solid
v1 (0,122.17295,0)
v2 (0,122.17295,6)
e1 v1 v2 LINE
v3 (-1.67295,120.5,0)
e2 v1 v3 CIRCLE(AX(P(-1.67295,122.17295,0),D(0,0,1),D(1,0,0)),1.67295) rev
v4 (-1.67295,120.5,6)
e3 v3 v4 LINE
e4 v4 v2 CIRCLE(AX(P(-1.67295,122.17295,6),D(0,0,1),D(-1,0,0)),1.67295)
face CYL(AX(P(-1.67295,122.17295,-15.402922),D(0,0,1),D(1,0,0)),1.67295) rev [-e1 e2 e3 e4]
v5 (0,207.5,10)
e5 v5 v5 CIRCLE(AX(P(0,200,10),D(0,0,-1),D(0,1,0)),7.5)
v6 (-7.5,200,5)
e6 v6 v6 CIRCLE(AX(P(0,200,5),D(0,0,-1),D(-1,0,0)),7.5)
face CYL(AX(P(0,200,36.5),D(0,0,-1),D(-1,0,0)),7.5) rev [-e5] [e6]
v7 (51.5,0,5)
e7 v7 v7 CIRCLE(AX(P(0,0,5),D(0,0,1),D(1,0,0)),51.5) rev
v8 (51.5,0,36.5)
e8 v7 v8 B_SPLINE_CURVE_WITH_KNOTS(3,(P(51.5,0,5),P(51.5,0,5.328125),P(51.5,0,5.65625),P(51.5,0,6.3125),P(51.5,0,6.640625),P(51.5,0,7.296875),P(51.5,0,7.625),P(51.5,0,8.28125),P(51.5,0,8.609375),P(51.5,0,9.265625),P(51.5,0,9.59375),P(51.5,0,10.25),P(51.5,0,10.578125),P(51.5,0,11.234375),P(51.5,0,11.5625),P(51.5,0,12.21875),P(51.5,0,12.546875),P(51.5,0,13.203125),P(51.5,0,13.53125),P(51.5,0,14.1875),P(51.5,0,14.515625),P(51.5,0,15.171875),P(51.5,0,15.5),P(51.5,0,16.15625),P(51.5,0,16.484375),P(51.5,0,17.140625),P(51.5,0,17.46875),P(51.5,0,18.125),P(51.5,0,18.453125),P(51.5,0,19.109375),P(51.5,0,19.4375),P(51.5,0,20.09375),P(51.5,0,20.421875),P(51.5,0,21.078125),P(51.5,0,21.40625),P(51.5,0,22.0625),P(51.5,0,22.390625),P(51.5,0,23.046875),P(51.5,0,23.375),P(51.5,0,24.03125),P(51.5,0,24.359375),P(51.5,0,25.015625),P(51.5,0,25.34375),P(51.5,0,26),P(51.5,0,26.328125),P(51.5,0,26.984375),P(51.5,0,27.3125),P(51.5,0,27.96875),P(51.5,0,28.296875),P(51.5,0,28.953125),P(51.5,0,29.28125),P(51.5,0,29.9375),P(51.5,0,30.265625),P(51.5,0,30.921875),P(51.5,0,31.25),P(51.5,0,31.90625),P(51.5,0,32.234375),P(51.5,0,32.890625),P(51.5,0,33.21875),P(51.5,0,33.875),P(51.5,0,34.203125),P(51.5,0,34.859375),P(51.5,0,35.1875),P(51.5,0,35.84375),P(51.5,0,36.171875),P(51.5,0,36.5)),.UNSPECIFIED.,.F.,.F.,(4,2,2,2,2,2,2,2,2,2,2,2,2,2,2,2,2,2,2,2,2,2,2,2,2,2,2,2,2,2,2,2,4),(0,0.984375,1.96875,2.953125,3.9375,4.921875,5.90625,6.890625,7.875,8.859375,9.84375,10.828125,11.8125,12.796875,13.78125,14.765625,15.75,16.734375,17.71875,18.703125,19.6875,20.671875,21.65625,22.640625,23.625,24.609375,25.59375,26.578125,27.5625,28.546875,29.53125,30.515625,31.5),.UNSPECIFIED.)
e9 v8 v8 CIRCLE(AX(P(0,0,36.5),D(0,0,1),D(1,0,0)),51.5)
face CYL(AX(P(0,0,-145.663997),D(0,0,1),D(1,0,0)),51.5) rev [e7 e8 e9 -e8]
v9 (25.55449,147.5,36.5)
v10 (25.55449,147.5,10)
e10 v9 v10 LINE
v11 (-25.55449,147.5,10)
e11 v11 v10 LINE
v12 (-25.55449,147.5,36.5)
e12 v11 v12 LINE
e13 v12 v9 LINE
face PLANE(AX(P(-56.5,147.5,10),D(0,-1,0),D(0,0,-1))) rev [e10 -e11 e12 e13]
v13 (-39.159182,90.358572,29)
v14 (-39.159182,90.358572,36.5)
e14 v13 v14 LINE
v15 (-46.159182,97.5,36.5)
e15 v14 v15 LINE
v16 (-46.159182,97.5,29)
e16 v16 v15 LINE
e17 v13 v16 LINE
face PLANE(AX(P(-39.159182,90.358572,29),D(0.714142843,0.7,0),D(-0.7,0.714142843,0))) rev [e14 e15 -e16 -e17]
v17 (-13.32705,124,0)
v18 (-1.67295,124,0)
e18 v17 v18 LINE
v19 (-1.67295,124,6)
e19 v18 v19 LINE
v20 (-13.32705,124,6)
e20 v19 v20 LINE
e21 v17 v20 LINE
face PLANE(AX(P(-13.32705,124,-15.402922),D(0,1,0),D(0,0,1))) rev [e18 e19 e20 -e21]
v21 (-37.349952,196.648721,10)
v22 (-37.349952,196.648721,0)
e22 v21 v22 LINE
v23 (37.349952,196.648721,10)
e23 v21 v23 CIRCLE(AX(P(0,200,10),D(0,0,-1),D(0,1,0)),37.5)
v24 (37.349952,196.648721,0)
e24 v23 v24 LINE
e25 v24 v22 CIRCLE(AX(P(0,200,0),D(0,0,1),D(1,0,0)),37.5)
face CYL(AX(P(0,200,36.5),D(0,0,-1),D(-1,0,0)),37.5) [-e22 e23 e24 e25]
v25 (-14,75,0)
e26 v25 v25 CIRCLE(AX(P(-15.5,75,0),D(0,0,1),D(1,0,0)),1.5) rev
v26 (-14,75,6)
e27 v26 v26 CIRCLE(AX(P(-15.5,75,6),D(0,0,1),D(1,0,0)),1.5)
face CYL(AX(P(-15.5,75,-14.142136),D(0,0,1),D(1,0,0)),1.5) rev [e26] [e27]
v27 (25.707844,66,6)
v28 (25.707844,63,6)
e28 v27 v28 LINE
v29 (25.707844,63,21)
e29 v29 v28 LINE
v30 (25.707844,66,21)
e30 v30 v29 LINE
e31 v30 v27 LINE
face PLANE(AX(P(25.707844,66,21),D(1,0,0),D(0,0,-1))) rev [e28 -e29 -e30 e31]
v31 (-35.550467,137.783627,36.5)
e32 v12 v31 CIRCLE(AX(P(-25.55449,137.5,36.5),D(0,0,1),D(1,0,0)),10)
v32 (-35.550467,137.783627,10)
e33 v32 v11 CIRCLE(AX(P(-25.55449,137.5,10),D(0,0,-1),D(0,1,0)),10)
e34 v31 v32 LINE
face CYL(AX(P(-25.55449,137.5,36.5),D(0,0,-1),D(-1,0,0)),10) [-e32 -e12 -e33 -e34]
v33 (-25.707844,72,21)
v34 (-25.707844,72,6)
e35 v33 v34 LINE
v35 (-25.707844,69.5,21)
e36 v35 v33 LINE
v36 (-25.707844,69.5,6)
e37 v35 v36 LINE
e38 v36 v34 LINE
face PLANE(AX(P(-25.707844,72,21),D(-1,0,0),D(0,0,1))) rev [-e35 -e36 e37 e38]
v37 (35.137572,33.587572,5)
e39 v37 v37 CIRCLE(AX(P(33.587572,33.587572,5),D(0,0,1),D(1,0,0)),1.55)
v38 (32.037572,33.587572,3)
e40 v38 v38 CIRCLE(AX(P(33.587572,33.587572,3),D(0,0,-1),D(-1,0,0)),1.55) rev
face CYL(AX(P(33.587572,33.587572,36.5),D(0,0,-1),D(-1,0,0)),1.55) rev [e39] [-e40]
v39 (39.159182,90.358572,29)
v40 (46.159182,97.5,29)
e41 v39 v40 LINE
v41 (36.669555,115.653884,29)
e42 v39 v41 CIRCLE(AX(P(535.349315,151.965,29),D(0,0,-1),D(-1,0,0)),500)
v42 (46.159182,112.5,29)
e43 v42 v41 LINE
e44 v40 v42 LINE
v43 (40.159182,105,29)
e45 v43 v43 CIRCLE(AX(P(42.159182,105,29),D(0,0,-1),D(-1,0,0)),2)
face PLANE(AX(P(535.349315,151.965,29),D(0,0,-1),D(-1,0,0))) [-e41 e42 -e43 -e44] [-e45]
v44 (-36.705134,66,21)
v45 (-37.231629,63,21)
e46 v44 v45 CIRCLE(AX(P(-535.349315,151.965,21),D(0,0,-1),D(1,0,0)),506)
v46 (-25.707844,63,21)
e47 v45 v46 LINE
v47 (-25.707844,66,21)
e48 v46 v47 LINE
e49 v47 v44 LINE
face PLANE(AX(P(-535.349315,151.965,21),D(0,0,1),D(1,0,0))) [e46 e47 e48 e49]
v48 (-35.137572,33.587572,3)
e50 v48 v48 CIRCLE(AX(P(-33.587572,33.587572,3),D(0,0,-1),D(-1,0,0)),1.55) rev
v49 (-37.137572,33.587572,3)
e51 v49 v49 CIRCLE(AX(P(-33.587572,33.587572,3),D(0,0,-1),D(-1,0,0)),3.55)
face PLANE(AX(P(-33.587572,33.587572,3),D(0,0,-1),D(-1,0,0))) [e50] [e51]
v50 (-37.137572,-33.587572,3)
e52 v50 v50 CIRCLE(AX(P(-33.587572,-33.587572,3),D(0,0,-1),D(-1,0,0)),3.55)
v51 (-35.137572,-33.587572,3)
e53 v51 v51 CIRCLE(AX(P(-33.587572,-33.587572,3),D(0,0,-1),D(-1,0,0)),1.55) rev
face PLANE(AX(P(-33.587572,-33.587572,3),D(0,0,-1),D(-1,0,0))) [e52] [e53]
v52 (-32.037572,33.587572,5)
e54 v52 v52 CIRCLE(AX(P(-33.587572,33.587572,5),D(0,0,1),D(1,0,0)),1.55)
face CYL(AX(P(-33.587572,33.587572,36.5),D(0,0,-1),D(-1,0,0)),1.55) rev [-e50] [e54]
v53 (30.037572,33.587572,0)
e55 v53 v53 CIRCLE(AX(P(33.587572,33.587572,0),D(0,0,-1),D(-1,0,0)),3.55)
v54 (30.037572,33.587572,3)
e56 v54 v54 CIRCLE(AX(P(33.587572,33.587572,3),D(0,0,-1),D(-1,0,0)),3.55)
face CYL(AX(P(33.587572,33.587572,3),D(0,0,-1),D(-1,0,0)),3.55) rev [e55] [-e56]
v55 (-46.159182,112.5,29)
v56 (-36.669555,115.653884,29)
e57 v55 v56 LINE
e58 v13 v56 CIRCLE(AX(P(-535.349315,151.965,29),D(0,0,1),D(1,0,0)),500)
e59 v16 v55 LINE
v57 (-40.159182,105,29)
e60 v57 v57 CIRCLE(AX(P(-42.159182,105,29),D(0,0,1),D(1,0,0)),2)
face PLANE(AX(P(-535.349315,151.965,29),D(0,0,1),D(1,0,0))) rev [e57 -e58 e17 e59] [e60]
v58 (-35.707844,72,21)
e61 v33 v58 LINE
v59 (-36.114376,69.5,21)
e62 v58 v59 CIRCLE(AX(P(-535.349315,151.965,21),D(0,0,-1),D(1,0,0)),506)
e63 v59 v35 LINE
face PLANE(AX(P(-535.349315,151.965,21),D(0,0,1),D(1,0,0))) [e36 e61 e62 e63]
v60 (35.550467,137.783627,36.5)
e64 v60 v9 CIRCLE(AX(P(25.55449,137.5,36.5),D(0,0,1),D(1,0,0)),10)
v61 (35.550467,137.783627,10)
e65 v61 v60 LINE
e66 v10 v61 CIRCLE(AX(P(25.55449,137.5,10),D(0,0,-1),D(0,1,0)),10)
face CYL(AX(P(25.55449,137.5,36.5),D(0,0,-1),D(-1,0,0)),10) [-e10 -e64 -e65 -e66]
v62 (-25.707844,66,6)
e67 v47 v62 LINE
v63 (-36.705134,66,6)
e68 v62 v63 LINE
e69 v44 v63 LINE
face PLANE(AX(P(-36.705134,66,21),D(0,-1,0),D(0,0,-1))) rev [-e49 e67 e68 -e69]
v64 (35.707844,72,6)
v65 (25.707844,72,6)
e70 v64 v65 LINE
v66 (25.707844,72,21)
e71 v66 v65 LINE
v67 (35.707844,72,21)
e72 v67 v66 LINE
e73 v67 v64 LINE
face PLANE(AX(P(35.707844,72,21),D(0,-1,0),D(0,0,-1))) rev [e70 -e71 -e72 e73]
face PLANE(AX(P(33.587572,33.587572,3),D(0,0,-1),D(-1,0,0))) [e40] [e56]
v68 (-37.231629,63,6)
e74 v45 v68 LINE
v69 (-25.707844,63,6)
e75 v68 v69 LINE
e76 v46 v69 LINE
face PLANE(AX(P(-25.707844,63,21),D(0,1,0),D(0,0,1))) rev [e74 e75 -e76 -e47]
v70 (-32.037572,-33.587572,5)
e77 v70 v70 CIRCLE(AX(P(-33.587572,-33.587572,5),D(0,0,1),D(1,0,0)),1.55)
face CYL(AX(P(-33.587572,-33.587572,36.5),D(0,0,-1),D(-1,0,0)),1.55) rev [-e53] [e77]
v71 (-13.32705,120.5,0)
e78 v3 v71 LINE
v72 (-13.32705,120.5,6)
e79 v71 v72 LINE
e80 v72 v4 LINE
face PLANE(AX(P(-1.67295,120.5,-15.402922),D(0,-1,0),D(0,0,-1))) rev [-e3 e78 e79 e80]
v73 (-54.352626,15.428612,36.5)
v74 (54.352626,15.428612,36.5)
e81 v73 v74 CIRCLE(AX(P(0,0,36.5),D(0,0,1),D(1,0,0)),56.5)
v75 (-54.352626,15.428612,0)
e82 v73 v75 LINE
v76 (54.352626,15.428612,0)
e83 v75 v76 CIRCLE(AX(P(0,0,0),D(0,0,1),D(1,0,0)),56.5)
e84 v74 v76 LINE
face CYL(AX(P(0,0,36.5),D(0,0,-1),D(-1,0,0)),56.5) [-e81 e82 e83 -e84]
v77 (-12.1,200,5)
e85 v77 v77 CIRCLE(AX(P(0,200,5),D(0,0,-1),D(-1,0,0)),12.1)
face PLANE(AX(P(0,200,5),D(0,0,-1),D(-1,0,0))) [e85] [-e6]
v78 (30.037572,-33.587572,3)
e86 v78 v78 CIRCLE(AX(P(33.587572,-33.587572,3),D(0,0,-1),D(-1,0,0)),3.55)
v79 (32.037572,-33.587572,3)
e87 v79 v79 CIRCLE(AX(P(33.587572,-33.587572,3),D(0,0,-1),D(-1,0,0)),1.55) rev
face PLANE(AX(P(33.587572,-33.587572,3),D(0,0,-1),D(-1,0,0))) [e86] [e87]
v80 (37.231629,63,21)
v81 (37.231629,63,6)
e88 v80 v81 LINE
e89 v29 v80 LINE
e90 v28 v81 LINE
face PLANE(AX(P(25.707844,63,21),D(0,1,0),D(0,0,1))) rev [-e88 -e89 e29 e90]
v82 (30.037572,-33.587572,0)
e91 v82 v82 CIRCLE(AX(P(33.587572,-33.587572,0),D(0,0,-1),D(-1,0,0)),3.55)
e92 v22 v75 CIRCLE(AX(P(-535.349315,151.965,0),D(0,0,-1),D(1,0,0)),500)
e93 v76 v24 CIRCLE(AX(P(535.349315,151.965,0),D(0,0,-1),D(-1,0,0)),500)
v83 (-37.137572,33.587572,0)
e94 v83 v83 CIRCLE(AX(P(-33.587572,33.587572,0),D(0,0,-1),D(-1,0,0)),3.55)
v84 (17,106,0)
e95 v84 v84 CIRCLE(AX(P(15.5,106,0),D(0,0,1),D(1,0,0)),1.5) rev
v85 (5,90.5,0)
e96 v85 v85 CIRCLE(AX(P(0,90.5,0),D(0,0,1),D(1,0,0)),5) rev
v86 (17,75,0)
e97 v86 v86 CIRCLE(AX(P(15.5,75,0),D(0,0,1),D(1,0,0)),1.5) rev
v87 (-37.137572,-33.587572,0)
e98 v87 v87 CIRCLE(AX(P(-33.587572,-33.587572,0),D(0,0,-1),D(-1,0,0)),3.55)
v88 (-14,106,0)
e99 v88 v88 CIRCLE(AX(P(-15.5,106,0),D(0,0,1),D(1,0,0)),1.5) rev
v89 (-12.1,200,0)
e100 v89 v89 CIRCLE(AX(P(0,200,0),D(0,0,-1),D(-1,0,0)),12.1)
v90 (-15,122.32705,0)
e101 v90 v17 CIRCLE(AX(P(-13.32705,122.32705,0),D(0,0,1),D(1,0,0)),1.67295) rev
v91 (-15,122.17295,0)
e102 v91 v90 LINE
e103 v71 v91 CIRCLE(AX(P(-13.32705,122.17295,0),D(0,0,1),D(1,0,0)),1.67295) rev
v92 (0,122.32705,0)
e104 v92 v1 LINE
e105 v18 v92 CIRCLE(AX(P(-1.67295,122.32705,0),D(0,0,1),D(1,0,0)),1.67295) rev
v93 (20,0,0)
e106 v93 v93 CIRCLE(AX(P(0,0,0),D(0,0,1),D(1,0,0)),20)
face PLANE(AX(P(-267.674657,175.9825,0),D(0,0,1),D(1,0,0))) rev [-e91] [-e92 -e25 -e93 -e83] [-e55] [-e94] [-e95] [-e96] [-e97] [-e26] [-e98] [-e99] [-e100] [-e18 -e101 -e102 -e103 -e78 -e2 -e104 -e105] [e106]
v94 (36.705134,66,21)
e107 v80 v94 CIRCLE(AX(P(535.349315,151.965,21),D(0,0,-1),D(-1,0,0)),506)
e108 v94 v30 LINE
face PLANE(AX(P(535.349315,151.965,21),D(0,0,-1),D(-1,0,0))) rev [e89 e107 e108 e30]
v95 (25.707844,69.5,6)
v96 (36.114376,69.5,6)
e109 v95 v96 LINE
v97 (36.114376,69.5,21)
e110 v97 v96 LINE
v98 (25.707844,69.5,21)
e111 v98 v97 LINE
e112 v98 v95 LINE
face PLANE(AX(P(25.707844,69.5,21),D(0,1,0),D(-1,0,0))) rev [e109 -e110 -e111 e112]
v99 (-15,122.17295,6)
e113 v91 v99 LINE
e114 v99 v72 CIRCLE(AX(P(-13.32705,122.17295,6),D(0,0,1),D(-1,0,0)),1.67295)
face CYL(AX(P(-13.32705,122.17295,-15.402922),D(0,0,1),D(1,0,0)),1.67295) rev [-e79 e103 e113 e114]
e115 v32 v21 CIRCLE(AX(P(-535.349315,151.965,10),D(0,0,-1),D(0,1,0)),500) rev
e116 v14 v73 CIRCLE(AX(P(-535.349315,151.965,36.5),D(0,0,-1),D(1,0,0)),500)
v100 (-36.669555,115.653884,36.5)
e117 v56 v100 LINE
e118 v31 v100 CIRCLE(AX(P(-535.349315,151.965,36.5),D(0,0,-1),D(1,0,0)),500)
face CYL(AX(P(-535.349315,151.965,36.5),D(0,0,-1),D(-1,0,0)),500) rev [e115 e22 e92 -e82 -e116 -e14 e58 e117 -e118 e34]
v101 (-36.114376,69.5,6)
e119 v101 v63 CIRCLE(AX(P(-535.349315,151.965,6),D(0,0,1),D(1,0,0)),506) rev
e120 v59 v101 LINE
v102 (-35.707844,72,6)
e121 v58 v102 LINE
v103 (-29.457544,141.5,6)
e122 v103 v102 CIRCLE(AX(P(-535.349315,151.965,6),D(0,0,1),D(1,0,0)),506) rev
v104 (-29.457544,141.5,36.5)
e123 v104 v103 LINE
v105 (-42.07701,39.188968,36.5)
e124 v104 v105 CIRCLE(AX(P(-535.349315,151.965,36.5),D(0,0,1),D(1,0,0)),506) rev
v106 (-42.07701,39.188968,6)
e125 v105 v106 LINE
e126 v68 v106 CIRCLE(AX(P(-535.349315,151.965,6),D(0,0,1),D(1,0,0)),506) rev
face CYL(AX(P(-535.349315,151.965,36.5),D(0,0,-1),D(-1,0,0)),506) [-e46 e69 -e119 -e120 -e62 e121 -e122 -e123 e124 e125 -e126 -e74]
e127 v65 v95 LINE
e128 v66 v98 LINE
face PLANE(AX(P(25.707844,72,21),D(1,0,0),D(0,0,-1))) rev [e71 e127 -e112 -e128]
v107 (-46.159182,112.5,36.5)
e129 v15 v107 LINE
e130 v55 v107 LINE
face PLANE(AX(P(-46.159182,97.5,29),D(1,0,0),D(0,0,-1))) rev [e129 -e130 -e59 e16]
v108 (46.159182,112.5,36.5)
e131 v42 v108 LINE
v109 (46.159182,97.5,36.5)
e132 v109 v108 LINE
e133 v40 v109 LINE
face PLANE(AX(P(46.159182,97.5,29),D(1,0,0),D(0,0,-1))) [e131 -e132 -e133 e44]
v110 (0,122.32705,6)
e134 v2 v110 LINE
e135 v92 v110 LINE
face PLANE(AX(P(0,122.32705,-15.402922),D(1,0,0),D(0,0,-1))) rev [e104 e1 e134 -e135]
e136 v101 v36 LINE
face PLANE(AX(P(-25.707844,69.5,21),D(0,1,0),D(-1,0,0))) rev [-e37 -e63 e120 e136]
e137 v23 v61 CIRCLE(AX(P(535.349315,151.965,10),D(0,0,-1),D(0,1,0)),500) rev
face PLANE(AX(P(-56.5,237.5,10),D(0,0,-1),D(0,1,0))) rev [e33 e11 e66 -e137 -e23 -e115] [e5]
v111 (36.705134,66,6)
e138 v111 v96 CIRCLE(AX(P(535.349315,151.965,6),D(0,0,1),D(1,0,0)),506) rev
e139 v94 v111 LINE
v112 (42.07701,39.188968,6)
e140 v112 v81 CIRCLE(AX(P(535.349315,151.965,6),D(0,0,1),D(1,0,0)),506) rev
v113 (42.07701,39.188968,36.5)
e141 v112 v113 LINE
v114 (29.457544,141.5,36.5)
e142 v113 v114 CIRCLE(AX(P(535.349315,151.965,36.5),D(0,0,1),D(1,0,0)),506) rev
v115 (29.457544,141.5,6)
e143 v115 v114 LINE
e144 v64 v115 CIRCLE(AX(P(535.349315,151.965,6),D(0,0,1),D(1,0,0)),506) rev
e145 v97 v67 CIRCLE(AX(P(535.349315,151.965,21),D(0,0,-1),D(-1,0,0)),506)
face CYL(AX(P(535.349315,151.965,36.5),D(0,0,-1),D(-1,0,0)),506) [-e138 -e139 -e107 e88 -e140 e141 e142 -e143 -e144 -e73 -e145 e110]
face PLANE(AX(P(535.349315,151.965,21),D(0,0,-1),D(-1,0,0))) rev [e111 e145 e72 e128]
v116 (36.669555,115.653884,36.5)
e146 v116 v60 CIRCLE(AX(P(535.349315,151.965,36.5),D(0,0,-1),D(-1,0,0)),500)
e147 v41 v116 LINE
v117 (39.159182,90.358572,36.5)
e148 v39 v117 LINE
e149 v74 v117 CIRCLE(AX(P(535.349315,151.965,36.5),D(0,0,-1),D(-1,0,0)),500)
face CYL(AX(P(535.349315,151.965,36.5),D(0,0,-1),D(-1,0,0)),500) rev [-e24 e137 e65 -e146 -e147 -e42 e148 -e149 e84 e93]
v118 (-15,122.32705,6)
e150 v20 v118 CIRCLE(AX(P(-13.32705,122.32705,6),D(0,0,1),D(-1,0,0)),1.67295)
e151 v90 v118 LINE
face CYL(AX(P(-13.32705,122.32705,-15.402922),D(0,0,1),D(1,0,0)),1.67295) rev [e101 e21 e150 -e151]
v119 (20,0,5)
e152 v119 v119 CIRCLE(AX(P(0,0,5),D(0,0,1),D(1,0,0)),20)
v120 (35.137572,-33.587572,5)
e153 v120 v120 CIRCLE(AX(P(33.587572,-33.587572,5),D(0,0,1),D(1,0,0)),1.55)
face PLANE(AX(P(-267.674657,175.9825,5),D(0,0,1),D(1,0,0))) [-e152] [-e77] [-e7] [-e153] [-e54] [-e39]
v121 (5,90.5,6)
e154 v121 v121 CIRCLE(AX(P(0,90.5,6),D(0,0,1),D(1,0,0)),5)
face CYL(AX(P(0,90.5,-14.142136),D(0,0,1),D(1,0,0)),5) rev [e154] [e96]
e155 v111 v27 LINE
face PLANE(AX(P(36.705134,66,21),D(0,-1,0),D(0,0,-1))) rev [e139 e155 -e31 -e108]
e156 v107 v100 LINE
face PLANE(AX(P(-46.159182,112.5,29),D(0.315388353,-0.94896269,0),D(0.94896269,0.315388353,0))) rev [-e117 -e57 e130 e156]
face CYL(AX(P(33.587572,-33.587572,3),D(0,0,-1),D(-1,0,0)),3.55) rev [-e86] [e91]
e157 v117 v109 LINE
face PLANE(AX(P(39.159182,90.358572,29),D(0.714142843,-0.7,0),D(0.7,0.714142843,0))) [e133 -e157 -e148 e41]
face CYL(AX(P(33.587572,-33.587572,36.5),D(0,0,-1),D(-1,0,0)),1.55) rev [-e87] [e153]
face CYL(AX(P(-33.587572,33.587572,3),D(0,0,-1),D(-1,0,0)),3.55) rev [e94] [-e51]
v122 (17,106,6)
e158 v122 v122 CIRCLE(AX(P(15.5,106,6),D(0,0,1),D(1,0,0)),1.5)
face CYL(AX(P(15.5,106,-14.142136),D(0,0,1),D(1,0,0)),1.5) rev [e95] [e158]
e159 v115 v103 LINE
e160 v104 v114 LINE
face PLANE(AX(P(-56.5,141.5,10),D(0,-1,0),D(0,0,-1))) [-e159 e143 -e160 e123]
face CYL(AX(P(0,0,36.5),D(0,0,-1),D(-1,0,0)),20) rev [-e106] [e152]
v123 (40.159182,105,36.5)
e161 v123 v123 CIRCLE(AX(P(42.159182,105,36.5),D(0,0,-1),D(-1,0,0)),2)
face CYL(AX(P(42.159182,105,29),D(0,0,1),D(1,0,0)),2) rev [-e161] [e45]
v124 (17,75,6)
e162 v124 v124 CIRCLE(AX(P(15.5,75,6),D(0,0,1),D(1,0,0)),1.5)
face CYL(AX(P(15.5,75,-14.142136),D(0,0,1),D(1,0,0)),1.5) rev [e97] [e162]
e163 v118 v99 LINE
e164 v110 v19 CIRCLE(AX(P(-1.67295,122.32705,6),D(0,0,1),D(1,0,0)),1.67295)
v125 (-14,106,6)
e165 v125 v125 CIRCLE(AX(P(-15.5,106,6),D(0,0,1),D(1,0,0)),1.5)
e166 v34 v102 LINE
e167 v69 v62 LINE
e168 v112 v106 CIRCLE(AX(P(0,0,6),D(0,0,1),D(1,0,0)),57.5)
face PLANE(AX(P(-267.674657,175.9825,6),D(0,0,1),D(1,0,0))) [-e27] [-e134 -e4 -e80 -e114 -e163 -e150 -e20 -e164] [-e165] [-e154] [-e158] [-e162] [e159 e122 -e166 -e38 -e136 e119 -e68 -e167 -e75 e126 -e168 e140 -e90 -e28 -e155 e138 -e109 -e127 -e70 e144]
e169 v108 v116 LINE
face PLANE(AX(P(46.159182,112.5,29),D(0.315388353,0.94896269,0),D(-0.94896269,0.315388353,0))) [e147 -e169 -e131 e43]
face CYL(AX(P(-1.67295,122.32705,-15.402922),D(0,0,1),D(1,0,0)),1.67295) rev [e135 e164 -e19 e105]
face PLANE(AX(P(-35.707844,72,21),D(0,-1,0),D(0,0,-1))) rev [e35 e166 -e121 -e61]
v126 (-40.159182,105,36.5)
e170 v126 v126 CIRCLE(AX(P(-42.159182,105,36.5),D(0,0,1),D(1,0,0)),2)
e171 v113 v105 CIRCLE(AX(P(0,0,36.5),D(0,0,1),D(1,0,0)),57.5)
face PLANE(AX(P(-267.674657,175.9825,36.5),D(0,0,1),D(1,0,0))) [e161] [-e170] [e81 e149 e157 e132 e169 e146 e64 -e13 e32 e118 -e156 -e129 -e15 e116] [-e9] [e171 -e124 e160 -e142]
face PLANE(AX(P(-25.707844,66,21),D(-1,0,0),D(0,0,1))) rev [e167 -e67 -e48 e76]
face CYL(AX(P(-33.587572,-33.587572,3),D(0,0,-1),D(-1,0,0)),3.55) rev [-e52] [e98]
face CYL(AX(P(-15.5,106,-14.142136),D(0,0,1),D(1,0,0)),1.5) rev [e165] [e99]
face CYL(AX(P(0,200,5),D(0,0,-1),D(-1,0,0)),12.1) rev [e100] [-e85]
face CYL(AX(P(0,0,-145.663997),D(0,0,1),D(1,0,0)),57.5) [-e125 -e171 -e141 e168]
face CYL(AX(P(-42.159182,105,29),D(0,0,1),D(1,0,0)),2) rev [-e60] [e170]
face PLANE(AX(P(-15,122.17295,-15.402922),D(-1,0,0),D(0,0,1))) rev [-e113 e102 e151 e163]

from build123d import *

# Parameters (mm, degrees)
SKETCH1_R               = 20
SKETCH1_R_2             = 7.5
BOSS_EXTRUDE1_DEPTH     = 36.5
SKETCH4_R               = 51.5
CUT_EXTRUDE3_DEPTH      = 31.5
CUT_EXTRUDE4_DEPTH      = 247.841548367
CUT_EXTRUDE4_DEPTH_BACK = 247.841548367
SKETCH5_W               = 26.5
SKETCH5_H               = 90
SHELL1_START            = 6
SHELL1_DEPTH            = 30.5
BOSS_EXTRUDE2_START     = -7.5
SKETCH7_R               = 2
BOSS_EXTRUDE2_DEPTH     = 7.5
BOSS_EXTRUDE3_DEPTH     = 15
CUT_EXTRUDE5_DEPTH      = 247.025913269
CUT_EXTRUDE5_DEPTH_BACK = 6
SKETCH9_R               = 5
SKETCH9_R_2             = 1.5
CUT_EXTRUDE6_DEPTH      = 6
FILLET1_R               = 10
SKETCH11_R              = 1.55
CUT_EXTRUDE7_DEPTH      = 247.841548367
SKETCH12_R              = 3.55
CUT_EXTRUDE8_DEPTH      = 3
SKETCH13_R              = 12.1
CUT_EXTRUDE9_DEPTH      = 5


# Read off the part's stored shape, not the designer's step: Shell1
with BuildPart() as part:
    # Sketch1 → Boss-Extrude1 (new body)
    with BuildSketch(Plane.XY):
        with BuildLine():
            ThreePointArc((-54.352625843, 15.42861186), (0, -56.5), (54.352625843, 15.42861186))
            ThreePointArc((54.352625843, 15.42861186), (37.535595393, 105.258460348), (37.34995219, 196.64872093))
            ThreePointArc((37.34995219, 196.64872093), (0, 237.5), (-37.34995219, 196.64872093))
            ThreePointArc((-37.34995219, 196.64872093), (-37.535595393, 105.258460348), (-54.352625843, 15.42861186))
        make_face()
        Circle(SKETCH1_R, mode=Mode.SUBTRACT)
        with Locations((0, 200)):
            Circle(SKETCH1_R_2, mode=Mode.SUBTRACT)
    extrude(amount=BOSS_EXTRUDE1_DEPTH)

    # Sketch4 → Cut-Extrude3 (cut)
    with BuildSketch(Plane.XY.offset(36.5)):
        Circle(SKETCH4_R)
    extrude(amount=-CUT_EXTRUDE3_DEPTH, mode=Mode.SUBTRACT)

    # Sketch5 → Cut-Extrude4 (cut, two sides: drawn at the far end of the back side and taken through both)
    with BuildSketch(Plane(origin=(0, 0, 0), x_dir=(0, 0, -1), z_dir=(1, 0, 0)).offset(-CUT_EXTRUDE4_DEPTH_BACK)):
        with Locations((-23.25, 192.5)):
            Rectangle(SKETCH5_W, SKETCH5_H)
    extrude(amount=CUT_EXTRUDE4_DEPTH + CUT_EXTRUDE4_DEPTH_BACK, mode=Mode.SUBTRACT)

    # Shell1 outline → Shell1 (cut)
    with BuildSketch(Plane.XY.offset(SHELL1_START)):
        with BuildLine():
            ThreePointArc((-42.077009937, 39.188968279), (0, 57.5), (42.077009937, 39.188968279))
            ThreePointArc((42.077009937, 39.188968279), (33.155030313, 90.022278833), (29.457543912, 141.5))
            Line((29.457543912, 141.5), (-29.457543912, 141.5))
            ThreePointArc((-29.457543912, 141.5), (-33.155030313, 90.022278833), (-42.077009937, 39.188968279))
        make_face()
    extrude(amount=SHELL1_DEPTH, mode=Mode.SUBTRACT)

    # Sketch7 → Boss-Extrude2 (add)
    # profile 1 of 2: a face of its own
    with BuildSketch(Plane.XY.offset(36.5).offset(BOSS_EXTRUDE2_START)):
        with BuildLine():
            Line((-39.159181835, 90.358571571), (-46.159181835, 97.5))
            Line((-46.159181835, 97.5), (-46.159181835, 112.5))
            Line((-46.159181835, 112.5), (-36.669554937, 115.653883533))
            ThreePointArc((-36.669554937, 115.653883533), (-37.753606302, 102.990404952), (-39.159181835, 90.358571571))
        make_face()
        with Locations((-42.159181835, 105)):
            Circle(SKETCH7_R, mode=Mode.SUBTRACT)
    # profile 2 of 2: a face of its own
    with BuildSketch(Plane.XY.offset(36.5).offset(BOSS_EXTRUDE2_START)):
        with BuildLine():
            Line((46.159181835, 97.5), (46.159181835, 112.5))
            Line((46.159181835, 112.5), (36.669554937, 115.653883533))
            ThreePointArc((36.669554937, 115.653883533), (37.753606302, 102.990404952), (39.159181835, 90.358571571))
            Line((39.159181835, 90.358571571), (46.159181835, 97.5))
        make_face()
        with Locations(Location((42.159181835, 105, 0), (0, 0, 180))):
            Circle(SKETCH7_R, mode=Mode.SUBTRACT)
    extrude(amount=BOSS_EXTRUDE2_DEPTH)

    # Sketch8 → Boss-Extrude3 (add)
    with BuildSketch(Plane.XY.offset(6)):
        with BuildLine():
            Line((-35.707844492, 72), (-25.707844492, 72))
            Line((-25.707844492, 72), (-25.707844492, 69.5))
            Line((-25.707844492, 69.5), (-36.114376268, 69.5))
            ThreePointArc((-36.114376268, 69.5), (-35.909546125, 70.749745632), (-35.707844492, 72))
        make_face()
        with BuildLine():
            Line((-36.705134195, 66), (-25.707844492, 66))
            Line((-25.707844492, 66), (-25.707844492, 63))
            Line((-25.707844492, 63), (-37.231629056, 63))
            ThreePointArc((-37.231629056, 63), (-36.966124321, 64.499603847), (-36.705134195, 66))
        make_face()
        with BuildLine():
            Line((25.707844492, 63), (37.231629056, 63))
            ThreePointArc((37.231629056, 63), (36.966124321, 64.499603847), (36.705134195, 66))
            Line((36.705134195, 66), (25.707844492, 66))
            Line((25.707844492, 66), (25.707844492, 63))
        make_face()
        with BuildLine():
            Line((25.707844492, 69.5), (36.114376268, 69.5))
            ThreePointArc((36.114376268, 69.5), (35.909546125, 70.749745632), (35.707844492, 72))
            Line((35.707844492, 72), (25.707844492, 72))
            Line((25.707844492, 72), (25.707844492, 69.5))
        make_face()
    extrude(amount=BOSS_EXTRUDE3_DEPTH)

    # Sketch9 → Cut-Extrude5 (cut, two sides: drawn at the far end of the back side and taken through both)
    with BuildSketch(Plane.XY.offset(6).offset(-CUT_EXTRUDE5_DEPTH_BACK)):
        with Locations((0, 90.5)):
            Circle(SKETCH9_R)
        with Locations((-15.5, 106)):
            Circle(SKETCH9_R_2)
        with Locations((15.5, 106)):
            Circle(SKETCH9_R_2)
        with Locations((15.5, 75)):
            Circle(SKETCH9_R_2)
        with Locations((-15.5, 75)):
            Circle(SKETCH9_R_2)
    extrude(amount=CUT_EXTRUDE5_DEPTH + CUT_EXTRUDE5_DEPTH_BACK, mode=Mode.SUBTRACT)

    # Sketch10 → Cut-Extrude6 (cut)
    with BuildSketch(Plane.XY.offset(6)):
        with BuildLine():
            Line((-13.327049627, 124), (-1.672950373, 124))
            ThreePointArc((-1.672950373, 124), (-0.48999582, 123.51000418), (0, 122.327049627))
            Line((0, 122.327049627), (0, 122.172950373))
            ThreePointArc((0, 122.172950373), (-0.48999582, 120.98999582), (-1.672950373, 120.5))
            Line((-1.672950373, 120.5), (-13.327049627, 120.5))
            ThreePointArc((-13.327049627, 120.5), (-14.51000418, 120.98999582), (-15, 122.172950373))
            Line((-15, 122.172950373), (-15, 122.327049627))
            ThreePointArc((-15, 122.327049627), (-14.51000418, 123.51000418), (-13.327049627, 124))
        make_face()
    extrude(amount=-CUT_EXTRUDE6_DEPTH, mode=Mode.SUBTRACT)

    # Fillet1
    fillet1_edges = [part.edges().sort_by_distance(p)[0] for p in [
        (35.369251346, 147.5, 23.25),
        (-35.369251346, 147.5, 23.25),
    ]]
    fillet(fillet1_edges, radius=FILLET1_R)

    # Sketch11 → Cut-Extrude7 (cut, through all)
    with BuildSketch(Plane(origin=(0, 0, 0), x_dir=(-1, 0, 0), z_dir=(0, 0, -1))):
        with Locations((-33.587572106, 33.587572106)):
            Circle(SKETCH11_R)
        with Locations((33.587572106, 33.587572106)):
            Circle(SKETCH11_R)
        with Locations((33.587572106, -33.587572106)):
            Circle(SKETCH11_R)
        with Locations((-33.587572106, -33.587572106)):
            Circle(SKETCH11_R)
    extrude(amount=-CUT_EXTRUDE7_DEPTH, mode=Mode.SUBTRACT)

    # Sketch12 → Cut-Extrude8 (cut)
    with BuildSketch(Plane(origin=(0, 0, 0), x_dir=(-1, 0, 0), z_dir=(0, 0, -1))):
        with Locations((-33.587572106, -33.587572106)):
            Circle(SKETCH12_R)
        with Locations((33.587572106, -33.587572106)):
            Circle(SKETCH12_R)
        with Locations((33.587572106, 33.587572106)):
            Circle(SKETCH12_R)
        with Locations((-33.587572106, 33.587572106)):
            Circle(SKETCH12_R)
    extrude(amount=-CUT_EXTRUDE8_DEPTH, mode=Mode.SUBTRACT)

    # Sketch13 → Cut-Extrude9 (cut)
    with BuildSketch(Plane(origin=(0, 0, 0), x_dir=(-1, 0, 0), z_dir=(0, 0, -1))):
        with Locations((0, 200)):
            Circle(SKETCH13_R)
    extrude(amount=-CUT_EXTRUDE9_DEPTH, mode=Mode.SUBTRACT)


solid = part.part
